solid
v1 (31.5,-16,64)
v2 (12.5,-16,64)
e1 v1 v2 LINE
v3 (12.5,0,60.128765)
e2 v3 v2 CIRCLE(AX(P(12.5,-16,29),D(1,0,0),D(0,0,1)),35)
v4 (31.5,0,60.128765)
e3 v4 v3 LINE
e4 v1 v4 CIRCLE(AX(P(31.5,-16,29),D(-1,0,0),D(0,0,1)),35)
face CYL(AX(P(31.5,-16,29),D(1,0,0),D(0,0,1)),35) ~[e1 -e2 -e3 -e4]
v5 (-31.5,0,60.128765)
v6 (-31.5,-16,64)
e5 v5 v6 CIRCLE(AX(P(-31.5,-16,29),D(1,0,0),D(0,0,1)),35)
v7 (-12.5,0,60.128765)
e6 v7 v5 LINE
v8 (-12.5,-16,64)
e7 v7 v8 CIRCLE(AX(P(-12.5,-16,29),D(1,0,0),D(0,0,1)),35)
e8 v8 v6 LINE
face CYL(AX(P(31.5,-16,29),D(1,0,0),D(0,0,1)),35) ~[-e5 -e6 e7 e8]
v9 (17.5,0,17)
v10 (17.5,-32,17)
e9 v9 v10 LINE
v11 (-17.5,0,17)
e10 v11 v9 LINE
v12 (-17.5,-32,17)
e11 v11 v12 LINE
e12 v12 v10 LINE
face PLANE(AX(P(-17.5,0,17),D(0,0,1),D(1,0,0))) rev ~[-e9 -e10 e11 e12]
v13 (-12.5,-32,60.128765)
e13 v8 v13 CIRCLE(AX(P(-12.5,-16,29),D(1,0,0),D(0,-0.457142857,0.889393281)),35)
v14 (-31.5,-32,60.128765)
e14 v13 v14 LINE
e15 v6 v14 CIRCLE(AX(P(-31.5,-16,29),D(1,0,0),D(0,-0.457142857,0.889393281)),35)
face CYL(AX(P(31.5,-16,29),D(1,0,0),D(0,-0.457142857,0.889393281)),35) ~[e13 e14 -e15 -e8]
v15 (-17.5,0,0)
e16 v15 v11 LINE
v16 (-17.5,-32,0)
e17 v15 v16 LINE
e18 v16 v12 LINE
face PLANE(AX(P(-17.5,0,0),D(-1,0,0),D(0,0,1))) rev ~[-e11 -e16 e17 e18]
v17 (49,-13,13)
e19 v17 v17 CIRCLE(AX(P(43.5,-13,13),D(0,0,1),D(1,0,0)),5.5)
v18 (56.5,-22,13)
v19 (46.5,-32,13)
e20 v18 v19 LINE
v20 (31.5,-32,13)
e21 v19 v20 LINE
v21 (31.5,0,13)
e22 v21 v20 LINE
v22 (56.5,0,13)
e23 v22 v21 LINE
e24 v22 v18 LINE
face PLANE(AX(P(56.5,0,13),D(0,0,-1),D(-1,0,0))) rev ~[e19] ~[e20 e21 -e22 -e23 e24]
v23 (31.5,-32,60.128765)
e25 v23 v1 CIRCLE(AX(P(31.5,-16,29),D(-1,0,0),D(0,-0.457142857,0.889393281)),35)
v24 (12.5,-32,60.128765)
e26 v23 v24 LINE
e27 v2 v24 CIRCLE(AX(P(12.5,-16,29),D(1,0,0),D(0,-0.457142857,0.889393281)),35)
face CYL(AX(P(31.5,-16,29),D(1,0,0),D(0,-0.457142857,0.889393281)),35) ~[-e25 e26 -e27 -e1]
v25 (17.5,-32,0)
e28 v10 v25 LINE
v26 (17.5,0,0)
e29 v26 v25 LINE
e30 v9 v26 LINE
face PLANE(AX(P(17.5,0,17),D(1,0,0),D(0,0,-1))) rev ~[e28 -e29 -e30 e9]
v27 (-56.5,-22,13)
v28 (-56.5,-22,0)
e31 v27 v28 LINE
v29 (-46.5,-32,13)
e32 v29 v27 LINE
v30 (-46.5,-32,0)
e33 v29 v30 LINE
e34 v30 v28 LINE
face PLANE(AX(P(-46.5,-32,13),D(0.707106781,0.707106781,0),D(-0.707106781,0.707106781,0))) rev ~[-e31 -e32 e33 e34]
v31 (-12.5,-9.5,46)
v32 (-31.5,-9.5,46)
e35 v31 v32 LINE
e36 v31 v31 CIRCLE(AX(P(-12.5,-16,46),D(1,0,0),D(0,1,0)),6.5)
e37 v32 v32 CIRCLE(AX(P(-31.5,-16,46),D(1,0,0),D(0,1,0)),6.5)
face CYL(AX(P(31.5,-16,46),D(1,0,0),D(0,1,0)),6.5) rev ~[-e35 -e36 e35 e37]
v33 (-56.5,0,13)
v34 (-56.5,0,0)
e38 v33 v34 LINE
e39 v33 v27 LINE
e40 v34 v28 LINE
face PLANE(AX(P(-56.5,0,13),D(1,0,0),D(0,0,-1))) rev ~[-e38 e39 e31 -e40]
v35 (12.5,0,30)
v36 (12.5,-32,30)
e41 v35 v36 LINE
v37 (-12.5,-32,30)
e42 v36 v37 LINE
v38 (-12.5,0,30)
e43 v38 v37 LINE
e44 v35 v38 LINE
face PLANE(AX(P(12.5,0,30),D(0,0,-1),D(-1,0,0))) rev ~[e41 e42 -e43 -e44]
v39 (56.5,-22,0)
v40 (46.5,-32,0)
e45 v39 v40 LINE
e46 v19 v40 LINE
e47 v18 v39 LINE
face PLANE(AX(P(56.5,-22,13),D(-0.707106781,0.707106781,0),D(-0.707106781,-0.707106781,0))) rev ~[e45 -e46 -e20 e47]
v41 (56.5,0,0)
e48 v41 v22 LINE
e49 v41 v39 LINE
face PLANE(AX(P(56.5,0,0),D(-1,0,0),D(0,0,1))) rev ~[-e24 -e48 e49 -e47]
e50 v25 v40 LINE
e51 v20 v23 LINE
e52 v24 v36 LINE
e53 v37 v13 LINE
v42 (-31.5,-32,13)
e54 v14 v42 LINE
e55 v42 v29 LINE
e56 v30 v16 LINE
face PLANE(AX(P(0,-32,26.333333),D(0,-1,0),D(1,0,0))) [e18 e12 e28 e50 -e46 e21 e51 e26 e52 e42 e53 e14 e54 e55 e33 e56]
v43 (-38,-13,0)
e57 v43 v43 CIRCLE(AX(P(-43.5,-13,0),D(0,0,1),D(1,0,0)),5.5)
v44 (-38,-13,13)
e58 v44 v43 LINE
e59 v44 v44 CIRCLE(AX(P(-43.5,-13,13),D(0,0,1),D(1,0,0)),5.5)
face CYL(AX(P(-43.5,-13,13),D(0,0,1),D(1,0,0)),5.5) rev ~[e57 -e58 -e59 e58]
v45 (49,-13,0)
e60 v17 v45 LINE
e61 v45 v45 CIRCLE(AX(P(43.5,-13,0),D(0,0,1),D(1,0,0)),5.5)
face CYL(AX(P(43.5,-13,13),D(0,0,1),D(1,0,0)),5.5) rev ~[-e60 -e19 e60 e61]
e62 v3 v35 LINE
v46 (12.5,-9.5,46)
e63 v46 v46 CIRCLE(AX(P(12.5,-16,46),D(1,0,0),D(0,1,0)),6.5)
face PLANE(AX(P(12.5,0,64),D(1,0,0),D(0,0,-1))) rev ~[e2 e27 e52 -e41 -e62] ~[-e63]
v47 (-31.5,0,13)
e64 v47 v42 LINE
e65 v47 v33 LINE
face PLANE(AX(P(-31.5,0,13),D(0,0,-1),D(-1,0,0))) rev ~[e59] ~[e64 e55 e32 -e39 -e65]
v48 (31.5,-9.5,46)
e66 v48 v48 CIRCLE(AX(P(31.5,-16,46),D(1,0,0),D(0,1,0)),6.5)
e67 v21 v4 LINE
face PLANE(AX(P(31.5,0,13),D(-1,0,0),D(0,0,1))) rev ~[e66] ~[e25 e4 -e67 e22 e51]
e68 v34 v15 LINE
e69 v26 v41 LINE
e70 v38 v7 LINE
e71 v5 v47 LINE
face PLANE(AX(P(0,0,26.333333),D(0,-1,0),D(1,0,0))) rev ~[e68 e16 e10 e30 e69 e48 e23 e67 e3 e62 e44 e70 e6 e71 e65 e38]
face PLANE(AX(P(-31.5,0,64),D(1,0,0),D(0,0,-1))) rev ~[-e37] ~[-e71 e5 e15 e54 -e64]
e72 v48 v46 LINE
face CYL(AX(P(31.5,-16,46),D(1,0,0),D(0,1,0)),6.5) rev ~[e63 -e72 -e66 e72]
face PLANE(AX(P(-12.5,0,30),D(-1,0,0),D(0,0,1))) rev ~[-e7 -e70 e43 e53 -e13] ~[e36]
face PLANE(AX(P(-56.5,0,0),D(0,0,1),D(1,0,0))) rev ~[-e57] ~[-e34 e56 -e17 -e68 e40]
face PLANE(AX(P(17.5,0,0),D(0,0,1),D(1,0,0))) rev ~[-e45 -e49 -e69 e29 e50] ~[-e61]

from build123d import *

# Parameters (mm, degrees)
F1_DEPTH = 32
F3_R     = 5.5
F2_R     = 5.5
F4_DEPTH = 13.001
F5_R     = 6.5
F6_DEPTH = 88.001


with BuildPart() as f1:
    # F0 (on Front) → F1 (new body)
    with BuildSketch(Plane.XZ):
        Polygon((-56.5, 13), (-56.5, 0), (-17.5, 0), (-17.5, 17), (17.5, 17), (17.5, 0), (56.5, 0), (56.5, 13), (31.5, 13), (31.5, 64), (12.5, 64), (12.5, 30), (-12.5, 30), (-12.5, 64), (-31.5, 64), (-31.5, 13), align=None)
    extrude(amount=F1_DEPTH)

    # F3 (on face) + F2 (on face) → F4 (cut, through all)
    with BuildSketch(Plane.XY.offset(13)):
        with Locations((-43.5, -13)):
            Circle(F3_R)
        Polygon((-46.5, -32), (-56.5, -22), (-56.5, -32), align=None)
    with BuildSketch(Plane.XY.offset(13)):
        with Locations((43.5, -13)):
            Circle(F2_R)
        Polygon((56.5, -22), (46.5, -32), (56.5, -32), align=None)
    extrude(amount=-F4_DEPTH, mode=Mode.SUBTRACT)

    # F5 (on face) → F6 (cut, through all)
    with BuildSketch(Plane.YZ.offset(31.5)):
        with Locations((-16, 46)):
            Circle(F5_R)
        with BuildLine():
            Line((-32, 64), (-32, 60.1287648325))
            ThreePointArc((-32, 60.1287648325), (-24.2308332161, 63.0184271325), (-16, 64))
            Line((-16, 64), (-32, 64))
        make_face()
        with BuildLine():
            Line((0, 64), (-16, 64))
            ThreePointArc((-16, 64), (-7.769166784, 63.0184271325), (0, 60.1287648325))
            Line((0, 60.1287648325), (0, 64))
        make_face()
    extrude(amount=-F6_DEPTH, mode=Mode.SUBTRACT)


solid = f1.part
